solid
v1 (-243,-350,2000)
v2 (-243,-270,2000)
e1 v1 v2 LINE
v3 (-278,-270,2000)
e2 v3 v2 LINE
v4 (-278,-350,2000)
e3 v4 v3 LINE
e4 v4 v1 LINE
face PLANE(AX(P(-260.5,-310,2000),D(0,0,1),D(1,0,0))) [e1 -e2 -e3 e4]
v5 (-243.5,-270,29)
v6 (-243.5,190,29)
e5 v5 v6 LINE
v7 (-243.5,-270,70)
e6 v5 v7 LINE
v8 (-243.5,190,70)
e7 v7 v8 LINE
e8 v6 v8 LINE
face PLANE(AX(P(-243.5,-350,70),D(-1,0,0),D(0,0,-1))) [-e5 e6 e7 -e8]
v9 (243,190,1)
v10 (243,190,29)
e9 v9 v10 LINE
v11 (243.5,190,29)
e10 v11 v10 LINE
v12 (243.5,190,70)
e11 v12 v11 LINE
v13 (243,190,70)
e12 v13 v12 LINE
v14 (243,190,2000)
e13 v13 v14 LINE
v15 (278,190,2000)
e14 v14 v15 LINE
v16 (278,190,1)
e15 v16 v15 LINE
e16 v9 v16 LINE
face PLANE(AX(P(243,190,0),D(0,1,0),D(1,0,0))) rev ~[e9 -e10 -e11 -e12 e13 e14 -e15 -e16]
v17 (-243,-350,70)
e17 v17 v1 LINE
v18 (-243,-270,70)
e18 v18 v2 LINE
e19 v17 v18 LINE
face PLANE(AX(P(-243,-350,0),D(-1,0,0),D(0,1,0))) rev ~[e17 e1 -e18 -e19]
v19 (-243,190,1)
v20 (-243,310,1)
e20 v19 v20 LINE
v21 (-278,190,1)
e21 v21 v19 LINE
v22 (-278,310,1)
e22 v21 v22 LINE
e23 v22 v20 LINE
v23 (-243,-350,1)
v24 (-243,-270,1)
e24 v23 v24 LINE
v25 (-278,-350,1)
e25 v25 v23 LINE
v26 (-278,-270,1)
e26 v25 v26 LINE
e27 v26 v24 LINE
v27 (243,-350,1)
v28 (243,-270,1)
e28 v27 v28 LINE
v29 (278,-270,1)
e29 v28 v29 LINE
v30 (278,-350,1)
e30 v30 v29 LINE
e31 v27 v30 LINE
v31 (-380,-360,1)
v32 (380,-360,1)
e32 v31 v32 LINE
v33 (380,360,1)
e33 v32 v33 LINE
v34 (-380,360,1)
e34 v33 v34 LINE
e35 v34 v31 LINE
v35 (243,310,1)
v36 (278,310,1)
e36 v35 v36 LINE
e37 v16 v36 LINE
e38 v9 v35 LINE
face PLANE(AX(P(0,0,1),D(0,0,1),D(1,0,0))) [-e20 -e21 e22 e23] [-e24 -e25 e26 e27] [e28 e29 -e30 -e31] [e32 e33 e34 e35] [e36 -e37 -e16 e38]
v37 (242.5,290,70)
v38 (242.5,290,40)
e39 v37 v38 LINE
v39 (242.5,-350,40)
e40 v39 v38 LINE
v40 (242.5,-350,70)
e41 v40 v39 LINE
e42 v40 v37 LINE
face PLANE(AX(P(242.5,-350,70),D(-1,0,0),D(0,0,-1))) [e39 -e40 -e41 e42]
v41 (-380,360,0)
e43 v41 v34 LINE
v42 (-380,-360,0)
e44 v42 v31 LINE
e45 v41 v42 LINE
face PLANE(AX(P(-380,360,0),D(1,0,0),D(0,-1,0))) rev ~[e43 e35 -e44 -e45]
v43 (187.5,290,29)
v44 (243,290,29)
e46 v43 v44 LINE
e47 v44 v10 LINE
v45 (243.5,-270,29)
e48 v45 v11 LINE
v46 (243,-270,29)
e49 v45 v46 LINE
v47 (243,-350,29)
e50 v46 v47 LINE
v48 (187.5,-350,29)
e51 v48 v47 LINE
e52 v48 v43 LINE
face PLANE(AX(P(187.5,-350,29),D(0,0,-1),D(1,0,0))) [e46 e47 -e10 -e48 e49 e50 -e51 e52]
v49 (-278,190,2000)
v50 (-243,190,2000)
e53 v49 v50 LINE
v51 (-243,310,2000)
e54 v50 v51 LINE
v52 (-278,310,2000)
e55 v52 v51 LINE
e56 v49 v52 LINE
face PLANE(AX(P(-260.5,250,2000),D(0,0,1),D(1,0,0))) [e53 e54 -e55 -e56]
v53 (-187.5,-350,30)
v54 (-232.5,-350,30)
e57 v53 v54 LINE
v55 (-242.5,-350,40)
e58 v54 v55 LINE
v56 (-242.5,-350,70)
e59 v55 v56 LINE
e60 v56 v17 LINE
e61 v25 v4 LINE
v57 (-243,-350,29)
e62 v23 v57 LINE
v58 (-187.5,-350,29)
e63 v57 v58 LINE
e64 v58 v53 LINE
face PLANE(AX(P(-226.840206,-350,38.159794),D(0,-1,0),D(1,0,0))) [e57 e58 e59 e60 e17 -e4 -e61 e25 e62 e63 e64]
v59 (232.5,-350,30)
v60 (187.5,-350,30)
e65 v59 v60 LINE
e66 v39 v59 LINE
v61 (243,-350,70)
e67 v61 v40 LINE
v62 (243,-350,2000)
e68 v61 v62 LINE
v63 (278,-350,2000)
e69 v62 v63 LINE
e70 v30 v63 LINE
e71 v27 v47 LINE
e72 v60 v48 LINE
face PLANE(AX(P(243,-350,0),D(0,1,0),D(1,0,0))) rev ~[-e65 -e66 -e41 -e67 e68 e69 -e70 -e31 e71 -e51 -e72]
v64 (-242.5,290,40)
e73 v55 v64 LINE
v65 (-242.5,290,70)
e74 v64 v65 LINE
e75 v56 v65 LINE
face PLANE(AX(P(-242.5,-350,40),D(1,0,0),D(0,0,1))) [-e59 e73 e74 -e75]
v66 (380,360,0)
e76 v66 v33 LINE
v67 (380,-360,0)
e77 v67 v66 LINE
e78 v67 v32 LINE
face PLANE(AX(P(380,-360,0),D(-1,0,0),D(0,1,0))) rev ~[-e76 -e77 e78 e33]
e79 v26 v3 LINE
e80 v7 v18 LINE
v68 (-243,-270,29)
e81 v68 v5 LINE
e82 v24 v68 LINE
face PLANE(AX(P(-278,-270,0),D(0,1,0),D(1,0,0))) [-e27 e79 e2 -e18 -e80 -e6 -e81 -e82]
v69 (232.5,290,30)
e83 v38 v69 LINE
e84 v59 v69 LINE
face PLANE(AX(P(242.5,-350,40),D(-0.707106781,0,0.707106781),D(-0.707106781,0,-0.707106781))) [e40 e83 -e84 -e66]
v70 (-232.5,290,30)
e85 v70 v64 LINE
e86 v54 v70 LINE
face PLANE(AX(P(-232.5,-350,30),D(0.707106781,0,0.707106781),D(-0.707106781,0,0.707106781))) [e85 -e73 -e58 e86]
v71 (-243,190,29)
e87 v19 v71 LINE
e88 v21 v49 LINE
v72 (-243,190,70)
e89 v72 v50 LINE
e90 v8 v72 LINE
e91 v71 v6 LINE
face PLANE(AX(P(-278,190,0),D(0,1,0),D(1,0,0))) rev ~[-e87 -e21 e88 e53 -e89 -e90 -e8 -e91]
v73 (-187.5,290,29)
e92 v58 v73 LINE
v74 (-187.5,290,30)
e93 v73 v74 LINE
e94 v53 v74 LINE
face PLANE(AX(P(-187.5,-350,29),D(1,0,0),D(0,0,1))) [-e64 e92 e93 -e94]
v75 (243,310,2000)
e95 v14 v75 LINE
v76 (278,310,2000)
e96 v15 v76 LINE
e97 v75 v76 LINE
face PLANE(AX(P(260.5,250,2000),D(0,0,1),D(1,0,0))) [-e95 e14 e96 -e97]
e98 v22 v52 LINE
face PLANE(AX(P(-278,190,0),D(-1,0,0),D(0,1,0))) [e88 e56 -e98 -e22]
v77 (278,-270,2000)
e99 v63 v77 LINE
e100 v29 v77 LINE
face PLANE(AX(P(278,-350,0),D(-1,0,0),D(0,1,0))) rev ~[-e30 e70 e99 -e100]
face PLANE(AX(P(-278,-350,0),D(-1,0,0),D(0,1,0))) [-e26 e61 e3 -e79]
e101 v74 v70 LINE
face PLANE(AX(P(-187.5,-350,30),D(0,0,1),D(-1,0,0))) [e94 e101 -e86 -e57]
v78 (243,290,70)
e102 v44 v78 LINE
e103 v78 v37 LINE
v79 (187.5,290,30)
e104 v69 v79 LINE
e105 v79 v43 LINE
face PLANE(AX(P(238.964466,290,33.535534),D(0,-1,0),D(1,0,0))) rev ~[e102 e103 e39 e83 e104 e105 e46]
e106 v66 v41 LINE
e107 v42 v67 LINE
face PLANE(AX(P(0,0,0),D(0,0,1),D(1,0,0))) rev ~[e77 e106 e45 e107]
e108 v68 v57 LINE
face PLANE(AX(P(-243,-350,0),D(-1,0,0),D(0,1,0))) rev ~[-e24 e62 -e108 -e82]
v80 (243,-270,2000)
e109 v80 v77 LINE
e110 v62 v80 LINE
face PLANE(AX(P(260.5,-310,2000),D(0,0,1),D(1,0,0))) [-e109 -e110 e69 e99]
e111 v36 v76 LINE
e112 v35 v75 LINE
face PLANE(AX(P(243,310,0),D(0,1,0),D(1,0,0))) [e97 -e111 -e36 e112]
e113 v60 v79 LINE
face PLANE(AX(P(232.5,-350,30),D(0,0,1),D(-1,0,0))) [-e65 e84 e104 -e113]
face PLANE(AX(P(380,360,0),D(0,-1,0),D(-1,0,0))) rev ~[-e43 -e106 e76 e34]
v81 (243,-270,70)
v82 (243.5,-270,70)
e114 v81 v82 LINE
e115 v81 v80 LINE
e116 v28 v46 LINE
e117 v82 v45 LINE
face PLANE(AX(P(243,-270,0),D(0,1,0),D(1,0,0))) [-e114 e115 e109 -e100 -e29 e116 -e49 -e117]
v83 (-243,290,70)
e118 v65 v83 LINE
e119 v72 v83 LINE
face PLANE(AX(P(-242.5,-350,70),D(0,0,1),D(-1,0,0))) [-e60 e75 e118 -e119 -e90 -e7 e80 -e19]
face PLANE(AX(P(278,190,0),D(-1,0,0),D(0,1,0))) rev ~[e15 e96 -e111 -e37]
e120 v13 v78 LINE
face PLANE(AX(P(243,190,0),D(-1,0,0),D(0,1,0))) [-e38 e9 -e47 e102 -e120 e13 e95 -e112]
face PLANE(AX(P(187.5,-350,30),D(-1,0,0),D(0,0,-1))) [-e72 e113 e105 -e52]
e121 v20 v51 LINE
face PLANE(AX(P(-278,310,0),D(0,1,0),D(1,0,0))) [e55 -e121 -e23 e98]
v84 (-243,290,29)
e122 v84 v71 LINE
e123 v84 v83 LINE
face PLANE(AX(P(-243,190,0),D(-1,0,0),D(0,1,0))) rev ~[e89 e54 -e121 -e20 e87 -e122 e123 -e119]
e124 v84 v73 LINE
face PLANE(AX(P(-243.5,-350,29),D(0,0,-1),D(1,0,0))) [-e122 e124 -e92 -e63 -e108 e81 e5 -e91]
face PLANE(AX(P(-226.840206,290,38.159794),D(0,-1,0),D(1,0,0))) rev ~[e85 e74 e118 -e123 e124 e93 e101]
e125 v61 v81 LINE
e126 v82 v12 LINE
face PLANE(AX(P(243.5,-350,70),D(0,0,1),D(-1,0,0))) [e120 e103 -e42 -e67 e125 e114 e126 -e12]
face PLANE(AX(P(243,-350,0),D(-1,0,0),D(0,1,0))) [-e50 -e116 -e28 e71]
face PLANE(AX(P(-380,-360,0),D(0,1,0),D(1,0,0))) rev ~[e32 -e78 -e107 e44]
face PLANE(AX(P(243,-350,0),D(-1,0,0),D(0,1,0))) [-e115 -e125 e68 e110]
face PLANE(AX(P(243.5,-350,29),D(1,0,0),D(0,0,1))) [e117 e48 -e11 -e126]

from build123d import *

# Parameters (mm, degrees)
F0_W     = 35
F0_H     = 80
F0_H_2   = 120
F2_DEPTH = 1
F4_DEPTH = 2000
F5_DEPTH = 640


# Not quite as in the source:
# - a feature names something its author has since deleted; it is built from what else it names


with BuildPart() as f2:
    # F0 (on Top) → F2 (new body)
    with BuildSketch(Plane.XY):
        Polygon((380, 360), (-380, 360), (-380, -360), (0, -360), (380, -360), align=None)
        with Locations((-260.5, -310)):
            Rectangle(F0_W, F0_H, mode=Mode.SUBTRACT)
        with Locations((260.5, -310)):
            Rectangle(F0_W, F0_H, mode=Mode.SUBTRACT)
        with Locations((-260.5, 250)):
            Rectangle(F0_W, F0_H_2, mode=Mode.SUBTRACT)
        with Locations((260.5, 250)):
            Rectangle(F0_W, F0_H_2, mode=Mode.SUBTRACT)
    extrude(amount=F2_DEPTH)

    # F0 (on Top) → F4 (join)
    with BuildSketch(Plane.XY):
        with Locations((-260.5, 250)):
            Rectangle(F0_W, F0_H_2)
        with Locations((-260.5, -310)):
            Rectangle(F0_W, F0_H)
        with Locations((260.5, -310)):
            Rectangle(F0_W, F0_H)
        with Locations((260.5, 250)):
            Rectangle(F0_W, F0_H_2)
    extrude(amount=F4_DEPTH)

    # F3 (on offset) → F5 (join)
    with BuildSketch(Plane.XZ.offset(350)):
        Polygon((-187.5, 29), (-187.5, 30), (-232.5, 30), (-242.5, 30), (-242.5, 40), (-242.5, 70), (-243.5, 70), (-243.5, 30), (-243.5, 29), align=None)
        Polygon((-242.5, 30), (-232.5, 30), (-242.5, 40), align=None)
        Polygon((242.5, 40), (232.5, 30), (242.5, 30), align=None)
        Polygon((232.5, 30), (187.5, 30), (187.5, 29), (243.5, 29), (243.5, 30), (243.5, 70), (242.5, 70), (242.5, 40), (242.5, 30), align=None)
    extrude(amount=-F5_DEPTH)


solid = f2.part
